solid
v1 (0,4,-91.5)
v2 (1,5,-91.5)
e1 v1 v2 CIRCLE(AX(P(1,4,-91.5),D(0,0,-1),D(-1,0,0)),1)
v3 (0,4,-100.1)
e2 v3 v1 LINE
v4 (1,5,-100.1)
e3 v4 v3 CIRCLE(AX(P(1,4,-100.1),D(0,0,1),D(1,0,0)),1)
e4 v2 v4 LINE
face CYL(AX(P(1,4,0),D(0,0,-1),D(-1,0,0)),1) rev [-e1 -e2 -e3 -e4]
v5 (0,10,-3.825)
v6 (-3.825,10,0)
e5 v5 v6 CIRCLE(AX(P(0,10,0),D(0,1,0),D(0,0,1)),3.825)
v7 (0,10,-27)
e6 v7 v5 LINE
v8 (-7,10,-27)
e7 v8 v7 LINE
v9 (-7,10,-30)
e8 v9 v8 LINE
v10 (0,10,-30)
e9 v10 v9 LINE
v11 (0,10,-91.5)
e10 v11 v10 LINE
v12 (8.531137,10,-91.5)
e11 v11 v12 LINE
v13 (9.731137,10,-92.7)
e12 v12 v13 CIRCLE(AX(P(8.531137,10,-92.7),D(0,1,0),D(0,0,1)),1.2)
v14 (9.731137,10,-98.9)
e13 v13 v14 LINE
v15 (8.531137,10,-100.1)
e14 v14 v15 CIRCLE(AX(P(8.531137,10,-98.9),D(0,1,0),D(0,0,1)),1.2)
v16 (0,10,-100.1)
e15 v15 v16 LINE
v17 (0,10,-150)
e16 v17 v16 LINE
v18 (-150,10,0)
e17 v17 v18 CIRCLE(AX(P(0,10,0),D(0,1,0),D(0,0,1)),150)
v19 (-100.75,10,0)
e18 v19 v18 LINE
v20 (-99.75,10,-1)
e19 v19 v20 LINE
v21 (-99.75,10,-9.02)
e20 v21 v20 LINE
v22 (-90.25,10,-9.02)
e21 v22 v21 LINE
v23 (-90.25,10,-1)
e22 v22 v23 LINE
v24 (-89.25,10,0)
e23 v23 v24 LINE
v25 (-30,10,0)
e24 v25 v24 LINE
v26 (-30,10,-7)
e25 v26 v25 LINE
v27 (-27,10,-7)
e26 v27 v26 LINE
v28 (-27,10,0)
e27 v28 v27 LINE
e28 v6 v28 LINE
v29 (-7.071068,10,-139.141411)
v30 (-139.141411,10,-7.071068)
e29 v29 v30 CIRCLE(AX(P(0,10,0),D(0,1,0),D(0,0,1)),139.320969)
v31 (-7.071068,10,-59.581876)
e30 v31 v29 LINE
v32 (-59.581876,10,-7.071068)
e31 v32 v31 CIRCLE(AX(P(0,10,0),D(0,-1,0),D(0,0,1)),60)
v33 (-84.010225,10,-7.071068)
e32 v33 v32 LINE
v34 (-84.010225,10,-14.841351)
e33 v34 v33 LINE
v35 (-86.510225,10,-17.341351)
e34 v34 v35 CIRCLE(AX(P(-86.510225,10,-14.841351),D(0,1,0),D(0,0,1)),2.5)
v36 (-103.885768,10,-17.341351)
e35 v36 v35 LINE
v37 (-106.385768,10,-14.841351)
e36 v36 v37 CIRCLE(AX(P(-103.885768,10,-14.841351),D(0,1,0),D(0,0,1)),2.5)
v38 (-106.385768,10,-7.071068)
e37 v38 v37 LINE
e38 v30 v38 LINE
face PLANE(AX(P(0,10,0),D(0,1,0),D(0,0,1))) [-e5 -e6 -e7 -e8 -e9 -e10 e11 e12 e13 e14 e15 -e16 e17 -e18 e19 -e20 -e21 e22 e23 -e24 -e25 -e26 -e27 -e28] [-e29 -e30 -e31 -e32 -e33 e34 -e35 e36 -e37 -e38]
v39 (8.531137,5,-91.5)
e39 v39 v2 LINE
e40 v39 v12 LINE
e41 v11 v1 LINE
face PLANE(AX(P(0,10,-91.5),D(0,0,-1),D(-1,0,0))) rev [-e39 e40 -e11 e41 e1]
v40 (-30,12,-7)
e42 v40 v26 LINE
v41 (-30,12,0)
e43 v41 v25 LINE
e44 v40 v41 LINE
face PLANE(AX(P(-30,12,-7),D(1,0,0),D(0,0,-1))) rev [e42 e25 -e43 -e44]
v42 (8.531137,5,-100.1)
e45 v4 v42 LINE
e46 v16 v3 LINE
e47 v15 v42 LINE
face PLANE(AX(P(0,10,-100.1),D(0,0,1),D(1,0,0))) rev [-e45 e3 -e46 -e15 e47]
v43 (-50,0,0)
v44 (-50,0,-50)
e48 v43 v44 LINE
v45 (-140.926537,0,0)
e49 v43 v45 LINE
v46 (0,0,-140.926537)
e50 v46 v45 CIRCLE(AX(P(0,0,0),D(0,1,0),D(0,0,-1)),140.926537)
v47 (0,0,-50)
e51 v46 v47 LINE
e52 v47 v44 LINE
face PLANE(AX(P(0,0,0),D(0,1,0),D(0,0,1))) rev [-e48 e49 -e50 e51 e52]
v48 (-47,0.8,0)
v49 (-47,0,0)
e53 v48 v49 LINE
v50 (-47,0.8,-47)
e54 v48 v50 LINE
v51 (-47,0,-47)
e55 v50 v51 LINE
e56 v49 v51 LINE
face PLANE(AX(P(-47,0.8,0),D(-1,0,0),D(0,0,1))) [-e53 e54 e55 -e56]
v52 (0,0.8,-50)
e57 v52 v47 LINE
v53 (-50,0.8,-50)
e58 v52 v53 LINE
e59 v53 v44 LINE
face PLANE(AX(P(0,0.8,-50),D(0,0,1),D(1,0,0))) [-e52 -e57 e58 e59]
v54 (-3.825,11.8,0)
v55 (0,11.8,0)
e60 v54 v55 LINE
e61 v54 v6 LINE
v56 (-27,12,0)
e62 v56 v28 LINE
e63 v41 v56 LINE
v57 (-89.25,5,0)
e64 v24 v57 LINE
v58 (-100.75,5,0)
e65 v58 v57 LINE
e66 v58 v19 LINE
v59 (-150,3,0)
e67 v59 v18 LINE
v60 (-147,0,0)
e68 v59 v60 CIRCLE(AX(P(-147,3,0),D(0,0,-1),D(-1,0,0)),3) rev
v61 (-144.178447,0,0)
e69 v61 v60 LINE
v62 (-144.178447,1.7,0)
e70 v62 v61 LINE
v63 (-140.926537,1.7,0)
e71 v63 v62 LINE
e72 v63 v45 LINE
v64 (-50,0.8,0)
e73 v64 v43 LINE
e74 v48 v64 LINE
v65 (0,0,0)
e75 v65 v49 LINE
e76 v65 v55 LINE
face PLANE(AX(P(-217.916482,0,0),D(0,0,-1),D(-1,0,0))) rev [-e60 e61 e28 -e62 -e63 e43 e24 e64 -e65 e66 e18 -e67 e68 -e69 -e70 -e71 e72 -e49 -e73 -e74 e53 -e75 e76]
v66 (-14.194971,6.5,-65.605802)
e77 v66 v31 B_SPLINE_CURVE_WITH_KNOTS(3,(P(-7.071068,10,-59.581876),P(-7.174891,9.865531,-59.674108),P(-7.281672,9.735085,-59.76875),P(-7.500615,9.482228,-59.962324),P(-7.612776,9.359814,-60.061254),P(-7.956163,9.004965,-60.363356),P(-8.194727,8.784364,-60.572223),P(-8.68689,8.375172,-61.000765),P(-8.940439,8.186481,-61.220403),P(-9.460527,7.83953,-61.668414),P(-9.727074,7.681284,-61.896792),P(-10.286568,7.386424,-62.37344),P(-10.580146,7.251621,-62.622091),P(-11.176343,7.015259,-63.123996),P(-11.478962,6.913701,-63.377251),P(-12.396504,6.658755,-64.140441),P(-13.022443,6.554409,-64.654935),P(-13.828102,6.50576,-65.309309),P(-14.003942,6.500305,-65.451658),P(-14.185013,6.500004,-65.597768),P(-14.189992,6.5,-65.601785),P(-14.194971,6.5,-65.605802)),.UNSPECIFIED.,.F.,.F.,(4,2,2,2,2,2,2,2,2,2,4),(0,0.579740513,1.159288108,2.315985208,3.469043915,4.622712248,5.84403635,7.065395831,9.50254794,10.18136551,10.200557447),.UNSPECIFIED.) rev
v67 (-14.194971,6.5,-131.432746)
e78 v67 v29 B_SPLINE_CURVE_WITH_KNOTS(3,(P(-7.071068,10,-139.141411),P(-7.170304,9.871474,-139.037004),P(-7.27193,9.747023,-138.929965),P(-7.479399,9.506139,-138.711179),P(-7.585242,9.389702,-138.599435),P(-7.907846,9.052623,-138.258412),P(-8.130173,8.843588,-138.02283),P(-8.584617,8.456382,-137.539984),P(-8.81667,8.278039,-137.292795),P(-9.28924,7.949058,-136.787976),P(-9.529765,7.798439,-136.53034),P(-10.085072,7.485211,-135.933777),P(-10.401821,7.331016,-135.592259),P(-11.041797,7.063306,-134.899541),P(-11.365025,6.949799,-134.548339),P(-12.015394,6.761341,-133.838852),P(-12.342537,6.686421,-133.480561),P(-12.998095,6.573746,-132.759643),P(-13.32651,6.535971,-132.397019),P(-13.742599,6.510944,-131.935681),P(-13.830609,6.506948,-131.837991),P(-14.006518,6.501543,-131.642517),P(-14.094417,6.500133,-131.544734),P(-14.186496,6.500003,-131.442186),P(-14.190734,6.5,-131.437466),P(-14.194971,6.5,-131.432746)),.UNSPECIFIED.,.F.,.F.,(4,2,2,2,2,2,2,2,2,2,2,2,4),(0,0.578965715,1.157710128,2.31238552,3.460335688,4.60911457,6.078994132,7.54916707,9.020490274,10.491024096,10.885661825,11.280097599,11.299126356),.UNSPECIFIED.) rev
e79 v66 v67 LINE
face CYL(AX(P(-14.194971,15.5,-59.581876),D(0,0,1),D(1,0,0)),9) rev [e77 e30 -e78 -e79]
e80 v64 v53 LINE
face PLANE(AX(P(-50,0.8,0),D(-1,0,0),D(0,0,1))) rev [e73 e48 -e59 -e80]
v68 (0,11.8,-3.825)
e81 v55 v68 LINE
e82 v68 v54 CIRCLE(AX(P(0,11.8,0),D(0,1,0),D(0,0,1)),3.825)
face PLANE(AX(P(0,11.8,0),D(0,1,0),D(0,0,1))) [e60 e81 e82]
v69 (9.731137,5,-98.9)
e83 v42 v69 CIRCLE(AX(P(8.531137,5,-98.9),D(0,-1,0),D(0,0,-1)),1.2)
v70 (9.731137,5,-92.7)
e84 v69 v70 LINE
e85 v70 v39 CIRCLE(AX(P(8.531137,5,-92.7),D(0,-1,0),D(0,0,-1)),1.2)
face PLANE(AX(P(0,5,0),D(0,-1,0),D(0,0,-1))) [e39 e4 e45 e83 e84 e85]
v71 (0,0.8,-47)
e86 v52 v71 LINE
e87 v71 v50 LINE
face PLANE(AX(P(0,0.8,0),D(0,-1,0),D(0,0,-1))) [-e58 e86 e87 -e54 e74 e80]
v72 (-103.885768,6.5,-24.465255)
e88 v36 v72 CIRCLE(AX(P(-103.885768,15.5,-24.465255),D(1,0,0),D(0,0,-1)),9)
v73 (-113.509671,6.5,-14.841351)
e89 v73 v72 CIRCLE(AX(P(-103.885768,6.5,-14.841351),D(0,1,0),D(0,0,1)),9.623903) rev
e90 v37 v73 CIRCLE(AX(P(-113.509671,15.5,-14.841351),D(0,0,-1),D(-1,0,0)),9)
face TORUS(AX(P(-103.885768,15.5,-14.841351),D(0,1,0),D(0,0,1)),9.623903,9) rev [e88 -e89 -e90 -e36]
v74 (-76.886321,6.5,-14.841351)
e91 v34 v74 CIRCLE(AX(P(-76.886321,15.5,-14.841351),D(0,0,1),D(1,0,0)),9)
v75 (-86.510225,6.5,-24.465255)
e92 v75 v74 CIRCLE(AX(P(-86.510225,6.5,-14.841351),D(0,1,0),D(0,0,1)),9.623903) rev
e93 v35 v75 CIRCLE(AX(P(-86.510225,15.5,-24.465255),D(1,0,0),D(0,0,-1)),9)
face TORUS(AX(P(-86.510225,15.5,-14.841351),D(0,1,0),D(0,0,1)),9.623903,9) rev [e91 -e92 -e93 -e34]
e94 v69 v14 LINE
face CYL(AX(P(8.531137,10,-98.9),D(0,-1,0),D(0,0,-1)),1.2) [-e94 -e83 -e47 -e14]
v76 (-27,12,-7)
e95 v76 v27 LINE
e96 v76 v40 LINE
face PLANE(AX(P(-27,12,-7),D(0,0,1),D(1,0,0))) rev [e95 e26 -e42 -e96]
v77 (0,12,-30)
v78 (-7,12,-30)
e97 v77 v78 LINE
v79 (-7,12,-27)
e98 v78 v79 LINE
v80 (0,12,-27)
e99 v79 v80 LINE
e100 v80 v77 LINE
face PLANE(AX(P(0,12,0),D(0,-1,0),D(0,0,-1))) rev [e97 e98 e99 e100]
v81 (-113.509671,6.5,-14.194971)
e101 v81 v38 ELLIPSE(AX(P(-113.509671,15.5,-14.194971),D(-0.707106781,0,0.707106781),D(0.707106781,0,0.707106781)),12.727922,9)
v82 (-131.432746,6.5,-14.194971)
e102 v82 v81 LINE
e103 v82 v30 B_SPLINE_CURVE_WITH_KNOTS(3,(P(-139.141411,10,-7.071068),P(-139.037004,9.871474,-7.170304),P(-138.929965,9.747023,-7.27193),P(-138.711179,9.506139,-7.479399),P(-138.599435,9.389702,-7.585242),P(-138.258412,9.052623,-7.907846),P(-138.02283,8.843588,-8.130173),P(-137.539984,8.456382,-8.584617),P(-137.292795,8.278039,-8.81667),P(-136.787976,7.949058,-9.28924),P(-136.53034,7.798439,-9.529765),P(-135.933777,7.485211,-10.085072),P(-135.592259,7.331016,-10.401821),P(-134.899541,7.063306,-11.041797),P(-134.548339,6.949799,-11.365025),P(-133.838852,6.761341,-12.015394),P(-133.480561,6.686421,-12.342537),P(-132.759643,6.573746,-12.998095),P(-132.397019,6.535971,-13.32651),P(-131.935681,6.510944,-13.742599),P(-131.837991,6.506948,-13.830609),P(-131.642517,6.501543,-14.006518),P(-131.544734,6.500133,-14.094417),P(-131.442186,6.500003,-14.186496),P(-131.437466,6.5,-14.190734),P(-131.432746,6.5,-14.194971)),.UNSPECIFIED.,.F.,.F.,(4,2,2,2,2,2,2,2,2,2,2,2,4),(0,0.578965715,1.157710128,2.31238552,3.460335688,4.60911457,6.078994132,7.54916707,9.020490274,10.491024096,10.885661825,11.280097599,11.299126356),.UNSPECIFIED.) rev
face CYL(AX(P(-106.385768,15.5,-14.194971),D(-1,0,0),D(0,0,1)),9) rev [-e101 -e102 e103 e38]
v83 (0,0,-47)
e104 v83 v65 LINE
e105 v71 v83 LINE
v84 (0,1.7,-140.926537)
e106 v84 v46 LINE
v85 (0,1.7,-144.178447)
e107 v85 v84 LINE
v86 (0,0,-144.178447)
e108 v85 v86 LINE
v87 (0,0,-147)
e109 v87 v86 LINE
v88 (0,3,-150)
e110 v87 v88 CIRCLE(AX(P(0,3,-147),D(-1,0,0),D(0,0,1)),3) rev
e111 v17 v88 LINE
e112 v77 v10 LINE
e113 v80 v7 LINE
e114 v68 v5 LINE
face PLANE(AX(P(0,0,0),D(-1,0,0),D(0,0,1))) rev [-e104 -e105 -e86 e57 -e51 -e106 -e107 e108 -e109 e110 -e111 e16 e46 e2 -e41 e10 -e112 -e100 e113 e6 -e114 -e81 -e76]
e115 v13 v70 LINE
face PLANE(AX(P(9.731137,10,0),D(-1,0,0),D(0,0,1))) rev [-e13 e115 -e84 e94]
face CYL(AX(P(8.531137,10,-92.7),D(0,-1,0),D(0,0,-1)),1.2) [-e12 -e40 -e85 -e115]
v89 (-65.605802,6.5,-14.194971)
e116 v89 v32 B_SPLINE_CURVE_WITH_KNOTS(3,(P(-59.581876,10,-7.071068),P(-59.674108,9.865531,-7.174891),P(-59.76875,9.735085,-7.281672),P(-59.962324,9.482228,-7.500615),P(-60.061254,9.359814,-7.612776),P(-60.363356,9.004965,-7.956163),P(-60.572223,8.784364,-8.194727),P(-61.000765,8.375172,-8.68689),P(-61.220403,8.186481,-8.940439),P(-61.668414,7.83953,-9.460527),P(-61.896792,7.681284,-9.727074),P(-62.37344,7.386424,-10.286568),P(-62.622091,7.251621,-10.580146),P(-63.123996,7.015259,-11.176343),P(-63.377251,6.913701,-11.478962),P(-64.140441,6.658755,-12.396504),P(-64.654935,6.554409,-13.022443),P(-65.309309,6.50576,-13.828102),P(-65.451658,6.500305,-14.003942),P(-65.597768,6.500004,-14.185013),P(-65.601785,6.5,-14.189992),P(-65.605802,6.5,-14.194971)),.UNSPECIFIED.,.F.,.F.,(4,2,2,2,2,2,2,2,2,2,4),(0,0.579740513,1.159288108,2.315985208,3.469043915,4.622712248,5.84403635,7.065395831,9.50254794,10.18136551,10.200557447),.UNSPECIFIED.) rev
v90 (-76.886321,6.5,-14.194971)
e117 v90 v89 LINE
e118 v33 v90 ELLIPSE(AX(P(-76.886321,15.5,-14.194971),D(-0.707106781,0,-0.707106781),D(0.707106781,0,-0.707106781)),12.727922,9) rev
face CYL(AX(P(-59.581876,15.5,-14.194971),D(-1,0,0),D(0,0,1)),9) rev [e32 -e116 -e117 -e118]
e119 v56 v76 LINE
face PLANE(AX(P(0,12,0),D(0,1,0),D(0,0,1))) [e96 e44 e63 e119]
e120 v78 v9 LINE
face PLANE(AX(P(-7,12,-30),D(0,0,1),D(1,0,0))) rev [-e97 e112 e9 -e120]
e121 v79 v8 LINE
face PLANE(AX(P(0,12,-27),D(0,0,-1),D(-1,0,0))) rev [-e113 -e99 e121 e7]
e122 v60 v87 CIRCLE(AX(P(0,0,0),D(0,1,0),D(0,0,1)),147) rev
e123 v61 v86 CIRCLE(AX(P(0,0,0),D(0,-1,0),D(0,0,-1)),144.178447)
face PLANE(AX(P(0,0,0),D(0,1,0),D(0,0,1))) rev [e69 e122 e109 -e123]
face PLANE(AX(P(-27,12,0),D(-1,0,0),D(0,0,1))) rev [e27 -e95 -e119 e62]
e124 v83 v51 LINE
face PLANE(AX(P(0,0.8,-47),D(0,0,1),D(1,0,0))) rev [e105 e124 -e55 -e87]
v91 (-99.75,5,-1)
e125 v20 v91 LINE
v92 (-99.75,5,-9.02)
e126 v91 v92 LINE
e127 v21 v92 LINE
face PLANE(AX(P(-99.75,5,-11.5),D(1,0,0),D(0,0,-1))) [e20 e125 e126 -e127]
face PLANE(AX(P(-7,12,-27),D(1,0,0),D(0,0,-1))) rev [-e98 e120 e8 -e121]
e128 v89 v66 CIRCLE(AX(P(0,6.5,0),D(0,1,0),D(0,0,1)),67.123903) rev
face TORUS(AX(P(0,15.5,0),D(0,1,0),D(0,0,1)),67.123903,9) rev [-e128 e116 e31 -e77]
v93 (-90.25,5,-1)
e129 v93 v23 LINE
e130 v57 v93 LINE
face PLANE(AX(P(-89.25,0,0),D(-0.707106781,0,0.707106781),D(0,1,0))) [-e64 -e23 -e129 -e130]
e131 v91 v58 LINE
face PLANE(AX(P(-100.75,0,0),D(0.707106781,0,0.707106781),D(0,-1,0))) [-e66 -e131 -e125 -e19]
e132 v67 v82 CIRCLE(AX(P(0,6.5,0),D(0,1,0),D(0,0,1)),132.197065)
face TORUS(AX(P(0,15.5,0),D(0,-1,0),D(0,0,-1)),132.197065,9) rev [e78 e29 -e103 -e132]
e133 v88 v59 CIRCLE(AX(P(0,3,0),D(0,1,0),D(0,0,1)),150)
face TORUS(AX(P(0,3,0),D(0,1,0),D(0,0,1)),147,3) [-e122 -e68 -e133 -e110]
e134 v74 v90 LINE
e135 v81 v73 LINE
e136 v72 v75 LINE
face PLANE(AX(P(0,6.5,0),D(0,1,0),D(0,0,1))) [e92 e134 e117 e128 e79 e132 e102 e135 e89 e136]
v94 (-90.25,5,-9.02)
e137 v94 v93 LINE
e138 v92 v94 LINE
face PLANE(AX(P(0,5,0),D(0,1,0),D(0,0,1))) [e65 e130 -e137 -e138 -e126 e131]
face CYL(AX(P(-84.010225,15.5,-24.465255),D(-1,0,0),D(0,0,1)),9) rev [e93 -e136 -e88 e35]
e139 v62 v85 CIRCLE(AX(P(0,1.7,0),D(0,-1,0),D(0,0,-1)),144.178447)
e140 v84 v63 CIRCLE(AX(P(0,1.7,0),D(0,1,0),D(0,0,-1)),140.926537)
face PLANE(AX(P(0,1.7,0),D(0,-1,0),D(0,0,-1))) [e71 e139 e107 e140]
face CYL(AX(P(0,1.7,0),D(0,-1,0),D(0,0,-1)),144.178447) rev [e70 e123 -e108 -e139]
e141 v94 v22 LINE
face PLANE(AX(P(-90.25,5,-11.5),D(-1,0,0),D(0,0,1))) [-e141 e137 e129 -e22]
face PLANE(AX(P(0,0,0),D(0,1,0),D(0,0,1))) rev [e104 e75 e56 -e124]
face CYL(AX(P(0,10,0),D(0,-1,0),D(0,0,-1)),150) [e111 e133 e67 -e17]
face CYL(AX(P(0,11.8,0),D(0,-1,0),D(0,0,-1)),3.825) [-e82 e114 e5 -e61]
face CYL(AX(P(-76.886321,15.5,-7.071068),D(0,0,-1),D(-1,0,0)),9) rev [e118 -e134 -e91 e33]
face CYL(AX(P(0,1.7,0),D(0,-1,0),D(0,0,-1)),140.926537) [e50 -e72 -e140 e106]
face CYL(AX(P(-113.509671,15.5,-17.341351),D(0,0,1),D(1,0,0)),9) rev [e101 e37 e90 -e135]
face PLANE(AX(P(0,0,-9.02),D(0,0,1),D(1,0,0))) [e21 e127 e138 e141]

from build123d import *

# Parameters (mm, degrees)
SKETCH1_R            = 150
BOSS_EXTRUDE3_DEPTH  = 10
CUT_EXTRUDE2_DEPTH   = 10
BOSS_EXTRUDE4_DEPTH  = 1.8
SKETCH6_W            = 3
SKETCH6_H            = 7
BOSS_EXTRUDE5_DEPTH  = 2
SKETCH7_W            = 7
SKETCH7_H            = 3
BOSS_EXTRUDE6_DEPTH  = 2
SKETCH8_W            = 10
SKETCH8_H            = 10
CUT_EXTRUDE3_DEPTH   = 5
SKETCH9_W            = 9.193751657
SKETCH9_H            = 8.277315045
BOSS_EXTRUDE7_DEPTH  = 4.35
CHAMFER1_SIZE        = 1
CUT_EXTRUDE4_DEPTH   = 1.7
CUT_EXTRUDE5_DEPTH   = 0.8
FILLET1_R            = 3
FILLET2_R            = 1.4
SKETCH12_W           = 10.671911796
SKETCH12_H           = 9.690192172
CUT_EXTRUDE6_DEPTH   = 11
SKETCH13_W           = 9.731136712
SKETCH13_H           = 8.6
BOSS_EXTRUDE8_DEPTH  = 10
SKETCH14_W           = 9.731136712
SKETCH14_H           = 8.6
CUT_EXTRUDE7_DEPTH   = 5
FILLET3_R            = 1
FILLET4_R            = 1.2
CUT_EXTRUDE8_DEPTH   = 3.5
FILLET5_R            = 2.5
FILLET6_R            = 9
SKETCH16_W           = 0.25
SKETCH16_H           = 5
BOSS_EXTRUDE9_DEPTH  = 11.5
SKETCH17_W           = 9.5
SKETCH17_H           = 5
BOSS_EXTRUDE12_DEPTH = 0.13
SKETCH19_W           = 9.5
SKETCH19_H           = 5
BOSS_EXTRUDE13_DEPTH = 0.85
CHAMFER2_SIZE        = 1


with BuildPart() as part:
    # Sketch1 → Boss-Extrude3 (new body)
    with BuildSketch(Plane(origin=(0, 0, 0), x_dir=(1, 0, 0), z_dir=(0, 1, 0))):
        with Locations(Location((0, 0, 0), (0, 0, 270))):
            Circle(SKETCH1_R)
    extrude(amount=BOSS_EXTRUDE3_DEPTH)

    # Sketch4 → Cut-Extrude2 (cut)
    with BuildSketch(Plane(origin=(0, 10, 0), x_dir=(1, 0, 0), z_dir=(0, 1, 0))):
        Polygon((0, 0), (0, 162.329653064), (183.678217859, 162.329653064), (183.678217859, -176.427761891), (-217.916482153, -176.427761891), (-217.916482153, 0), align=None)
    extrude(amount=-CUT_EXTRUDE2_DEPTH, mode=Mode.SUBTRACT)

    # Sketch5 → Boss-Extrude4 (add)
    with BuildSketch(Plane(origin=(0, 10, 0), x_dir=(1, 0, 0), z_dir=(0, 1, 0))):
        with BuildLine():
            Line((0, 3.825), (0, 0))
            Line((0, 0), (-3.825, 0))
            ThreePointArc((-3.825, 0), (-2.704683438, 2.704683438), (0, 3.825))
        make_face()
    extrude(amount=BOSS_EXTRUDE4_DEPTH)

    # Sketch6 → Boss-Extrude5 (add)
    with BuildSketch(Plane(origin=(0, 10, 0), x_dir=(1, 0, 0), z_dir=(0, 1, 0))):
        with Locations((-28.5, 3.5)):
            Rectangle(SKETCH6_W, SKETCH6_H)
    extrude(amount=BOSS_EXTRUDE5_DEPTH)

    # Sketch7 → Boss-Extrude6 (add)
    with BuildSketch(Plane(origin=(0, 10, 0), x_dir=(1, 0, 0), z_dir=(0, 1, 0))):
        with Locations((-3.5, 28.5)):
            Rectangle(SKETCH7_W, SKETCH7_H)
    extrude(amount=BOSS_EXTRUDE6_DEPTH)

    # Sketch8 → Cut-Extrude3 (cut)
    with BuildSketch(Plane(origin=(0, 10, 0), x_dir=(1, 0, 0), z_dir=(0, 1, 0))):
        with Locations((-95, 5)):
            Rectangle(SKETCH8_W, SKETCH8_H)
    extrude(amount=-CUT_EXTRUDE3_DEPTH, mode=Mode.SUBTRACT)

    # Sketch9 → Boss-Extrude7 (add)
    with BuildSketch(Plane(origin=(0, 10, 0), x_dir=(1, 0, 0), z_dir=(0, 1, 0))):
        with Locations((4.596875828, 95.138657523)):
            Rectangle(SKETCH9_W, SKETCH9_H)
    extrude(amount=-BOSS_EXTRUDE7_DEPTH)

    # Chamfer1
    chamfer1_edges = [part.edges().sort_by_distance(p)[0] for p in [
        (9.193751657, 7.825, -99.277315045),
        (9.193751657, 7.825, -91),
    ]]
    chamfer(chamfer1_edges, length=CHAMFER1_SIZE)

    # Sketch10 → Cut-Extrude4 (cut)
    with BuildSketch(Plane.XZ):
        with BuildLine():
            Line((-140.926536809, 0), (-144.178447036, 0))
            ThreePointArc((-144.178447036, 0), (-101.9495576, -101.9495576), (0, -144.178447036))
            Line((0, -144.178447036), (0, -140.926536809))
            ThreePointArc((0, -140.926536809), (-99.650109827, -99.650109827), (-140.926536809, 0))
        make_face()
    extrude(amount=-CUT_EXTRUDE4_DEPTH, mode=Mode.SUBTRACT)

    # Sketch11 → Cut-Extrude5 (cut)
    with BuildSketch(Plane(origin=(0, 0, 0), x_dir=(-1, 0, 0), z_dir=(0, -1, 0))):
        Polygon((47, 0), (50, 0), (50, 50), (0, 50), (0, 47), (47, 47), align=None)
    extrude(amount=-CUT_EXTRUDE5_DEPTH, mode=Mode.SUBTRACT)

    # Fillet1
    fillet1_edges = [part.edges().sort_by_distance(p)[0] for p in [
        (-106.066017178, 0, -106.066017178),
    ]]
    fillet(fillet1_edges, radius=FILLET1_R)

    # Fillet2
    fillet2_edges = [part.edges().sort_by_distance(p)[0] for p in [
        (0, 5.65, -95.138657523),
    ]]
    fillet(fillet2_edges, radius=FILLET2_R)

    # Sketch12 → Cut-Extrude6 (cut)
    with BuildSketch(Plane(origin=(0, 0, 0), x_dir=(-1, 0, 0), z_dir=(0, -1, 0))):
        with Locations((-5.335955898, 95.265421493)):
            Rectangle(SKETCH12_W, SKETCH12_H)
    extrude(amount=-CUT_EXTRUDE6_DEPTH, mode=Mode.SUBTRACT)

    # Sketch13 → Boss-Extrude8 (add)
    with BuildSketch(Plane(origin=(0, 0, 0), x_dir=(-1, 0, 0), z_dir=(0, -1, 0))):
        with Locations((-4.865568356, 95.8)):
            Rectangle(SKETCH13_W, SKETCH13_H)
    extrude(amount=-BOSS_EXTRUDE8_DEPTH)

    # Sketch14 → Cut-Extrude7 (cut)
    with BuildSketch(Plane(origin=(0, 0, 0), x_dir=(-1, 0, 0), z_dir=(0, -1, 0))):
        with Locations((-4.865568356, 95.8)):
            Rectangle(SKETCH14_W, SKETCH14_H)
    extrude(amount=-CUT_EXTRUDE7_DEPTH, mode=Mode.SUBTRACT)

    # Fillet3
    fillet3_edges = [part.edges().sort_by_distance(p)[0] for p in [
        (0, 5, -95.8),
    ]]
    fillet(fillet3_edges, radius=FILLET3_R)

    # Fillet4
    fillet4_edges = [part.edges().sort_by_distance(p)[0] for p in [
        (9.731136712, 7.5, -91.5),
        (9.731136712, 7.5, -100.1),
    ]]
    fillet(fillet4_edges, radius=FILLET4_R)

    # Sketch15 → Cut-Extrude8 (cut)
    with BuildSketch(Plane(origin=(0, 10, 0), x_dir=(1, 0, 0), z_dir=(0, 1, 0))):
        with BuildLine():
            Line((-84.010224854, 7.071067812), (-84.010224854, 17.341351392))
            Line((-84.010224854, 17.341351392), (-106.385767568, 17.341351392))
            Line((-106.385767568, 17.341351392), (-106.385767568, 7.071067812))
            Line((-106.385767568, 7.071067812), (-139.141411083, 7.071067812))
            ThreePointArc((-139.141411083, 7.071067812), (-98.514801625, 98.514801625), (-7.071067812, 139.141411083))
            Line((-7.071067812, 139.141411083), (-7.071067812, 59.581876439))
            ThreePointArc((-7.071067812, 59.581876439), (-42.426406871, 42.426406871), (-59.581876439, 7.071067812))
            Line((-59.581876439, 7.071067812), (-84.010224854, 7.071067812))
        make_face()
    extrude(amount=-CUT_EXTRUDE8_DEPTH, mode=Mode.SUBTRACT)

    # Fillet5
    fillet5_edges = [part.edges().sort_by_distance(p)[0] for p in [
        (-84.010224854, 8.25, -17.341351392),
        (-106.385767568, 8.25, -17.341351392),
    ]]
    fillet(fillet5_edges, radius=FILLET5_R)

    # Fillet6
    # the kernel refuses this fillet: 9 mm, written as the material it adds along each edge
    with BuildSketch(Plane(origin=(-103.885767568, 6.5, -14.841351392), x_dir=(-1, 0, 0), z_dir=(0, 0, 1))) as fillet6_piece_1:
        with BuildLine():
            CenterArc((9.623903424, -9), FILLET6_R, 90, 52.330113036)
            Line((9.623903424, 0), (2.5, 0))
            Line((2.5, 0), (2.5, -3.5))
        make_face()
    revolve(axis=Axis((-103.885767568, 6.5, -14.841351392), (0, -1, 0)), revolution_arc=90)
    with BuildSketch(Plane(origin=(-86.510224854, 6.5, -14.841351392), x_dir=(0, 0, -1), z_dir=(-1, 0, 0))) as fillet6_piece_2:
        with BuildLine():
            CenterArc((9.623903424, -9), FILLET6_R, 90, 52.330113036)
            Line((9.623903424, 0), (2.5, 0))
            Line((2.5, 0), (2.5, -3.5))
        make_face()
    revolve(axis=Axis((-86.510224854, 6.5, -14.841351392), (0, -1, 0)), revolution_arc=90)
    with BuildSketch(Plane(origin=(0, 6.5, 0), x_dir=(-0.9970291212395074, 0, 0.07702552434340171), z_dir=(0.07702552434340171, 0, 0.9970291212395074))) as fillet6_piece_3_section:
        with BuildLine():
            CenterArc((132.197065128, -9), FILLET6_R, 37.669886964, 52.330113036)
            Line((132.197065128, 0), (139.320968552, 0))
            Line((139.320968552, 0), (139.320968552, -3.5))
        make_face()
    fillet6_piece_3 = revolve(axis=Axis((0, 6.5, 0), (0, -1, 0)), revolution_arc=98.835226115, mode=Mode.PRIVATE)
    fillet6_piece_3 = split(fillet6_piece_3, bisect_by=Plane(origin=(0, 6.5, 0), z_dir=(-1, 0, 0)), keep=Keep.TOP, mode=Mode.PRIVATE)
    fillet6_piece_3 = split(fillet6_piece_3, bisect_by=Plane(origin=(0, 6.5, 0), z_dir=(0, 0, -1)), keep=Keep.TOP, mode=Mode.PRIVATE)
    add(fillet6_piece_3)
    with BuildSketch(Plane(origin=(-88.576009007, 6.5, -7.071067812), x_dir=(0, 1, 0), z_dir=(-1, 0, 0))) as fillet6_piece_4_section:
        with BuildLine():
            CenterArc((9, 7.123903424), FILLET6_R, 180, 52.330113036)
            Line((0, 7.123903424), (0, 0))
            Line((0, 0), (3.5, 0))
        make_face()
    fillet6_piece_4 = extrude(amount=68.375160637, mode=Mode.PRIVATE)
    fillet6_piece_4 = fillet6_piece_4 & Plane(origin=(0, 6.5, 0), x_dir=(0, 0, 1), z_dir=(0, -1, 0)) * Cylinder(150, 166, mode=Mode.PRIVATE)
    fillet6_piece_4 = split(fillet6_piece_4, bisect_by=Plane(origin=(-100, 6.5, -7.071067812), z_dir=(-1, 0, 0)), keep=Keep.TOP, mode=Mode.PRIVATE)
    add(fillet6_piece_4)
    with BuildSketch(Plane(origin=(-86.510224854, 6.5, -17.341351392), x_dir=(0, 1, 0), z_dir=(-1, 0, 0))) as fillet6_piece_5:
        with BuildLine():
            CenterArc((9, 7.123903424), FILLET6_R, 180, 52.330113036)
            Line((0, 7.123903424), (0, 0))
            Line((0, 0), (3.5, 0))
        make_face()
    extrude(amount=17.375542715)
    with BuildSketch(Plane(origin=(-41.772117878, 6.5, -7.071067812), x_dir=(0, 1, 0), z_dir=(-1, 0, 0))) as fillet6_piece_6_section:
        with BuildLine():
            CenterArc((9, 7.123903424), FILLET6_R, 180, 52.330113036)
            Line((0, 7.123903424), (0, 0))
            Line((0, 0), (3.5, 0))
        make_face()
    fillet6_piece_6 = extrude(amount=60.047865536, mode=Mode.PRIVATE)
    fillet6_piece_6 = split(fillet6_piece_6, bisect_by=Plane(origin=(-90, 6.5, -7.071067812), z_dir=(1, 0, 0)), keep=Keep.TOP, mode=Mode.PRIVATE)
    add(fillet6_piece_6)
    with BuildSketch(Plane(origin=(-7.071067812, 6.5, -156.951169644), x_dir=(0, 1, 0), z_dir=(0, 0, 1))) as fillet6_piece_7_section:
        with BuildLine():
            CenterArc((9, 7.123903424), FILLET6_R, 180, 52.330113036)
            Line((0, 7.123903424), (0, 0))
            Line((0, 0), (3.5, 0))
        make_face()
    fillet6_piece_7 = extrude(amount=115.179051766, mode=Mode.PRIVATE)
    fillet6_piece_7 = fillet6_piece_7 & Plane(origin=(0, 6.5, 0), x_dir=(0, 0, 1), z_dir=(0, -1, 0)) * Cylinder(150, 259, mode=Mode.PRIVATE)
    add(fillet6_piece_7)
    with BuildSketch(Plane(origin=(0, 6.5, 0), x_dir=(0.17783871438849583, 0, -0.9840596484282074), z_dir=(0.9840596484282074, 0, 0.17783871438849583))) as fillet6_piece_8_section:
        with BuildLine():
            CenterArc((67.123903424, 9), FILLET6_R, 217.669886964, 52.330113036)
            Line((67.123903424, 0), (60, 0))
            Line((60, 0), (60, 3.5))
        make_face()
    fillet6_piece_8 = revolve(axis=Axis((0, 6.5, 0), (0, 1, 0)), revolution_arc=110.487792536, mode=Mode.PRIVATE)
    fillet6_piece_8 = split(fillet6_piece_8, bisect_by=Plane(origin=(0, 6.5, 0), z_dir=(-1, 0, 0)), keep=Keep.TOP, mode=Mode.PRIVATE)
    fillet6_piece_8 = split(fillet6_piece_8, bisect_by=Plane(origin=(0, 6.5, 0), z_dir=(0, 0, -1)), keep=Keep.TOP, mode=Mode.PRIVATE)
    add(fillet6_piece_8)
    with BuildSketch(Plane(origin=(-84.010224854, 6.5, 10.738690749), x_dir=(0, 1, 0), z_dir=(0, 0, -1))) as fillet6_piece_9_section:
        with BuildLine():
            CenterArc((9, 7.123903424), FILLET6_R, 180, 52.330113036)
            Line((0, 7.123903424), (0, 0))
            Line((0, 0), (3.5, 0))
        make_face()
    fillet6_piece_9 = extrude(amount=25.580042141, mode=Mode.PRIVATE)
    fillet6_piece_9 = split(fillet6_piece_9, bisect_by=Plane(origin=(-84.010224854, 6.5, 0), z_dir=(0, 0, -1)), keep=Keep.TOP, mode=Mode.PRIVATE)
    add(fillet6_piece_9)
    with BuildSketch(Plane(origin=(-106.385767568, 6.5, -14.841351392), x_dir=(0, 1, 0), z_dir=(0, 0, 1))) as fillet6_piece_10_section:
        with BuildLine():
            CenterArc((9, 7.123903424), FILLET6_R, 180, 52.330113036)
            Line((0, 7.123903424), (0, 0))
            Line((0, 0), (3.5, 0))
        make_face()
    fillet6_piece_10 = extrude(amount=25.580042141, mode=Mode.PRIVATE)
    fillet6_piece_10 = split(fillet6_piece_10, bisect_by=Plane(origin=(-106.385767568, 6.5, 0), z_dir=(0, 0, -1)), keep=Keep.TOP, mode=Mode.PRIVATE)
    add(fillet6_piece_10)

    # Sketch16 → Boss-Extrude9 (add)
    with BuildSketch(Plane.XY):
        with Locations((-99.875, 7.5)):
            Rectangle(SKETCH16_W, SKETCH16_H)
        with Locations((-90.125, 7.5)):
            Rectangle(SKETCH16_W, SKETCH16_H)
    extrude(amount=-BOSS_EXTRUDE9_DEPTH)

    # Sketch17 → Boss-Extrude12 (add)
    with BuildSketch(Plane.XY.offset(-10)):
        with Locations((-95, 7.5)):
            Rectangle(SKETCH17_W, SKETCH17_H)
    extrude(amount=BOSS_EXTRUDE12_DEPTH)

    # Sketch19 → Boss-Extrude13 (add)
    with BuildSketch(Plane.XY.offset(-9.87)):
        with Locations((-95, 7.5)):
            Rectangle(SKETCH19_W, SKETCH19_H)
    extrude(amount=BOSS_EXTRUDE13_DEPTH)

    # Chamfer2
    chamfer2_edges = [part.edges().sort_by_distance(p)[0] for p in [
        (-99.75, 7.5, 0),
        (-90.25, 7.5, 0),
    ]]
    chamfer(chamfer2_edges, length=CHAMFER2_SIZE)


solid = part.part
